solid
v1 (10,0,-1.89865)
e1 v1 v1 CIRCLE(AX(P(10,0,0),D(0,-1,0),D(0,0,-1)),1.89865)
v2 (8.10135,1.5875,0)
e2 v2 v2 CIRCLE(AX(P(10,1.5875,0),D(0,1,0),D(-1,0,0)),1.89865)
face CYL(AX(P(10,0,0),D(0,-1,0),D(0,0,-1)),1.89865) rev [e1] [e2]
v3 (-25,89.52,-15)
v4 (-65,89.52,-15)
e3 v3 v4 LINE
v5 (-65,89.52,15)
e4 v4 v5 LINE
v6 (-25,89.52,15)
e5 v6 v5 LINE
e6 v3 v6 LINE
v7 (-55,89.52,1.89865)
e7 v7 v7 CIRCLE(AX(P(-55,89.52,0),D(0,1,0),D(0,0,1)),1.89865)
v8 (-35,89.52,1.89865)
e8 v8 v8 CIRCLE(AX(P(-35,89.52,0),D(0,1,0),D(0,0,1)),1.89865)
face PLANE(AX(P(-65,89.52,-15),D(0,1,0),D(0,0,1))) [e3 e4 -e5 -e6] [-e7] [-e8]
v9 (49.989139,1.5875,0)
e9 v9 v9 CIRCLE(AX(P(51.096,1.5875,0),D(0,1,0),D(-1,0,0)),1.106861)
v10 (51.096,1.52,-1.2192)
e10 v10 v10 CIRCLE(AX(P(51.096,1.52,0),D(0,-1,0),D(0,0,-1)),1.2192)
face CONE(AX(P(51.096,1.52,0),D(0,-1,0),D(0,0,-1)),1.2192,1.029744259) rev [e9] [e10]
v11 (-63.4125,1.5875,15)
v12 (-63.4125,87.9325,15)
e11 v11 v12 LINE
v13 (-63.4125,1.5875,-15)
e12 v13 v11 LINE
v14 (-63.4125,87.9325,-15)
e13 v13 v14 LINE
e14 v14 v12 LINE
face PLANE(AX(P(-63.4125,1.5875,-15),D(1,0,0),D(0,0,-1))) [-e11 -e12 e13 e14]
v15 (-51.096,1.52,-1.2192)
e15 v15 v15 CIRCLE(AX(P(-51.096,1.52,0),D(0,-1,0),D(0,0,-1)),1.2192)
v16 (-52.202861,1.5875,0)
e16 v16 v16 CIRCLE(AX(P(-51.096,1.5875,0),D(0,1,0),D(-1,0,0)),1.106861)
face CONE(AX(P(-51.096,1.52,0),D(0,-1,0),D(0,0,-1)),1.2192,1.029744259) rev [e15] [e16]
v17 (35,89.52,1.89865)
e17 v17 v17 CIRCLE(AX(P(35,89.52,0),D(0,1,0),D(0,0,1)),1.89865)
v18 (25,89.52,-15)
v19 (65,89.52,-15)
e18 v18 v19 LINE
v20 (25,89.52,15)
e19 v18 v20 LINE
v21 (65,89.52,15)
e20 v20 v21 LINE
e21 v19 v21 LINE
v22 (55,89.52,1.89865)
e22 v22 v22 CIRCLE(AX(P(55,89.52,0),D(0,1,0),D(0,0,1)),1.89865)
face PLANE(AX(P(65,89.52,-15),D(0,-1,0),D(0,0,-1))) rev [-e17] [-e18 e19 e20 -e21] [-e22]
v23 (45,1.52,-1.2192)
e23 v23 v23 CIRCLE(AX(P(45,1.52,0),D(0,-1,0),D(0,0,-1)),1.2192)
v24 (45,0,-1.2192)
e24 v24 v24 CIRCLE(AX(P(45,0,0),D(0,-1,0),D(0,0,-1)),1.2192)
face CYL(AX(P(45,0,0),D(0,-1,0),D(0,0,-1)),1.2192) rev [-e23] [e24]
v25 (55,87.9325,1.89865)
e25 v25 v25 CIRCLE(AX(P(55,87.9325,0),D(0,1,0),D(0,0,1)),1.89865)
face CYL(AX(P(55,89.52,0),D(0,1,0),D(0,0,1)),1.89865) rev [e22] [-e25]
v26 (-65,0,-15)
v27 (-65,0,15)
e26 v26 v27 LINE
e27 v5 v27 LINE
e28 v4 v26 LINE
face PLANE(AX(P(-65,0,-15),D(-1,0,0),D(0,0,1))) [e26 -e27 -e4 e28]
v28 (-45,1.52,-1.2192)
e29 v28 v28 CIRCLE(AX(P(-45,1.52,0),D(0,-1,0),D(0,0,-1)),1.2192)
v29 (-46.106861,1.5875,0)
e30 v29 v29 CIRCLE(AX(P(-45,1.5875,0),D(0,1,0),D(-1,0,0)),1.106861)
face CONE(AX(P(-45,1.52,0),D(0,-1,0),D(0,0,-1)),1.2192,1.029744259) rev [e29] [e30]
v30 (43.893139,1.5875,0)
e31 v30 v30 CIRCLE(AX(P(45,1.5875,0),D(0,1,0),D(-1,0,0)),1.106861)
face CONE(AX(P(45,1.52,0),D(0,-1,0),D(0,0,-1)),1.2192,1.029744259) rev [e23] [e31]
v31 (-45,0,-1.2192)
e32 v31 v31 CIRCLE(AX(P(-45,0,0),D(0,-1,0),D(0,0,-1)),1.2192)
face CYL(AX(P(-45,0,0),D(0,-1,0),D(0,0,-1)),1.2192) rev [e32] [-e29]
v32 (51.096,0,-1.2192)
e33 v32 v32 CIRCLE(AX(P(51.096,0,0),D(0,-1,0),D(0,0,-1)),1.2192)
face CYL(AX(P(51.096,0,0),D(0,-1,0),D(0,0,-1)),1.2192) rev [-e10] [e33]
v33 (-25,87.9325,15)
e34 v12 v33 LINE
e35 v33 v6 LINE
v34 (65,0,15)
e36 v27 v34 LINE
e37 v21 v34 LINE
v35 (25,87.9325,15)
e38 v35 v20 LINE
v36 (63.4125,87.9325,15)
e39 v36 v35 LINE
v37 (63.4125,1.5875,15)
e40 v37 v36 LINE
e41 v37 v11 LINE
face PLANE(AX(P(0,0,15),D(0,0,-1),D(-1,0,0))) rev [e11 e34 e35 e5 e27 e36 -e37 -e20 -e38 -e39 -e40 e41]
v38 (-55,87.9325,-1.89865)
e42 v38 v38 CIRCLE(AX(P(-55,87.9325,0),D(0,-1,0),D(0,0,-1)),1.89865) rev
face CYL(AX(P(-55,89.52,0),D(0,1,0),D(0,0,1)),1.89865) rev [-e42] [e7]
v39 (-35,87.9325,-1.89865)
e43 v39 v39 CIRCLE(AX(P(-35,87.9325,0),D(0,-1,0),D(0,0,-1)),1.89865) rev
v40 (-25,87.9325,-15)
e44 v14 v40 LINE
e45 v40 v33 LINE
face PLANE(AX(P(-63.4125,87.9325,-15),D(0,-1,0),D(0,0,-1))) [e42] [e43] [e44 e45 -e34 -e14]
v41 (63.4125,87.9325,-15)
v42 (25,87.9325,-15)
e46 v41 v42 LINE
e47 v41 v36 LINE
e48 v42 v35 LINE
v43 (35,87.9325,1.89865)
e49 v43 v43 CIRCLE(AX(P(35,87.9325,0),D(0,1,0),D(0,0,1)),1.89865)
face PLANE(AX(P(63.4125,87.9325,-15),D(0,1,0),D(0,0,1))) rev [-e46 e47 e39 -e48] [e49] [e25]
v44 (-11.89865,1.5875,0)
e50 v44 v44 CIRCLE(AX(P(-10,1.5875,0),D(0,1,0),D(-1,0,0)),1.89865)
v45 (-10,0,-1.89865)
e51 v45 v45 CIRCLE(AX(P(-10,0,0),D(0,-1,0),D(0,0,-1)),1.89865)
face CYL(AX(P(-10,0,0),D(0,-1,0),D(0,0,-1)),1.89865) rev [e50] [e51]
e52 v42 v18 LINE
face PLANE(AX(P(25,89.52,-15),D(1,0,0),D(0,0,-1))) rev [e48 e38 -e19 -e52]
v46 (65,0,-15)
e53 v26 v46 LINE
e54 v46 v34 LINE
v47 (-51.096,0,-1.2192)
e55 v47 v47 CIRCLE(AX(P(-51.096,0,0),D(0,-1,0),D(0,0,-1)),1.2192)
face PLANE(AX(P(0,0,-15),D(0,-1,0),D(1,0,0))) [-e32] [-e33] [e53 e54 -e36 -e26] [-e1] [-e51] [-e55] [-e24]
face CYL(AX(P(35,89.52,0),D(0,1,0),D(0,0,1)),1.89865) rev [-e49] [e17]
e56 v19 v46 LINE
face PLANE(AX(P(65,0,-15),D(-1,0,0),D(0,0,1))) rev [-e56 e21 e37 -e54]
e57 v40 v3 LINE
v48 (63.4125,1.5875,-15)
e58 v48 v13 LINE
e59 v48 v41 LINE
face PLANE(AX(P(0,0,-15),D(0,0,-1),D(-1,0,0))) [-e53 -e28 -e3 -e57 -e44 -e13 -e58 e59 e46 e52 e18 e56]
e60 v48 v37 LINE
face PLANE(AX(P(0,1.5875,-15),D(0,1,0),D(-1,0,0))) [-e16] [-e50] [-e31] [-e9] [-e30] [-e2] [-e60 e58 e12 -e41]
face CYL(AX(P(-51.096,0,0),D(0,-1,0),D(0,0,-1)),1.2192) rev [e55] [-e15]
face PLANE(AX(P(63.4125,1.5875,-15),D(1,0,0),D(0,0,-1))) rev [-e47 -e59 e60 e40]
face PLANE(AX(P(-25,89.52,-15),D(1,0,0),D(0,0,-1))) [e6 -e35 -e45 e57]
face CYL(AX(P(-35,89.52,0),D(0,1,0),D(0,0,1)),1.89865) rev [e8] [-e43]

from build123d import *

# Parameters (mm, degrees)
BOSS_EXTRUDE1_DEPTH            = 15
F_2_CLEARANCE_HOLE1_AT_2_COUNT = 2
F_2_CLEARANCE_HOLE1_AT_2_PITCH = 6.096
F_6_START                      = 87.9325
F_6_CLEARANCE_HOLE1_OUTLINE_R  = 1.89865
F_6_CLEARANCE_HOLE1_DEPTH      = 1.5875
F_6_CLEARANCE_HOLE2_D          = 3.7973


# Read off the part's stored shape, not the designer's step: #6 Clearance Hole1
with BuildPart() as part:
    # Sketch1 → Boss-Extrude1 (new, symmetric)
    with BuildSketch(Plane.XY):
        Polygon((0, 0), (-65, 0), (-65, 89.52), (-25, 89.52), (-25, 87.9325), (-63.4125, 87.9325), (-63.4125, 1.5875), (0, 1.5875), align=None)
    boss_extrude1 = extrude(amount=BOSS_EXTRUDE1_DEPTH, both=True)

    # Sketch2 → #2 Clearance Hole1 (revolve, cut)
    with BuildSketch(Plane(origin=(-51.096, 0, 0), x_dir=(0, 0, -1), z_dir=(1, 0, 0))):
        Polygon((0, 0), (0, 2.252569267), (1.2192, 1.52), (1.2192, 0), align=None)
    f_2_clearance_hole1 = revolve(axis=Axis((-51.096, -6.35, 0), (0, 1, 0)), mode=Mode.SUBTRACT)

    # #2 Clearance Hole1 at 2: #2 Clearance Hole1 ×2
    with Locations(*[(i * F_2_CLEARANCE_HOLE1_AT_2_PITCH, 0, 0) for i in range(1, F_2_CLEARANCE_HOLE1_AT_2_COUNT)]):
        add(f_2_clearance_hole1, mode=Mode.SUBTRACT)

    # #6 Clearance Hole1 outline → #6 Clearance Hole1 (cut)
    with BuildSketch(Plane(origin=(0, 0, 0), x_dir=(1, 0, 0), z_dir=(0, 1, 0)).offset(F_6_START)):
        with Locations((-55, 0)):
            Circle(F_6_CLEARANCE_HOLE1_OUTLINE_R)
        with Locations((-35, 0)):
            Circle(F_6_CLEARANCE_HOLE1_OUTLINE_R)
    f_6_clearance_hole1 = extrude(amount=F_6_CLEARANCE_HOLE1_DEPTH, mode=Mode.SUBTRACT)

    # Mirror2: Boss-Extrude1, #2 Clearance Hole1, #6 Clearance Hole1 across plane
    add(boss_extrude1.mirror(Plane(origin=(0, 1.5875, -15), x_dir=(0, 0, 1), z_dir=(1, 0, 0))))
    add(f_2_clearance_hole1.mirror(Plane(origin=(0, 1.5875, -15), x_dir=(0, 0, 1), z_dir=(1, 0, 0))), mode=Mode.SUBTRACT)
    add(f_6_clearance_hole1.mirror(Plane(origin=(0, 1.5875, -15), x_dir=(0, 0, 1), z_dir=(1, 0, 0))), mode=Mode.SUBTRACT)

    # Mirror2 copy 1 sketch → Mirror2 copy 1 (revolve, cut)
    with BuildSketch(Plane(origin=(45, 0, 0), x_dir=(0, 0, -1), z_dir=(-1, 0, 0))):
        Polygon((0, 0), (0, -2.252569267), (1.2192, -1.52), (1.2192, 0), align=None)
    revolve(axis=Axis((45, -6.35, 0), (0, -1, 0)), mode=Mode.SUBTRACT)

    # #6 Clearance Hole2 (through all)
    with Locations(Plane(origin=(0, 0, 0), x_dir=(-1, 0, 0), z_dir=(0, -1, 0))):
        with Locations((-10, 0)):
            f_6_clearance_hole2 = Hole(F_6_CLEARANCE_HOLE2_D / 2)

    # Mirror3: #6 Clearance Hole2 across plane
    add(f_6_clearance_hole2.mirror(Plane(origin=(0, 0, 0), x_dir=(0, 0, 1), z_dir=(1, 0, 0))), mode=Mode.SUBTRACT)


solid = part.part
